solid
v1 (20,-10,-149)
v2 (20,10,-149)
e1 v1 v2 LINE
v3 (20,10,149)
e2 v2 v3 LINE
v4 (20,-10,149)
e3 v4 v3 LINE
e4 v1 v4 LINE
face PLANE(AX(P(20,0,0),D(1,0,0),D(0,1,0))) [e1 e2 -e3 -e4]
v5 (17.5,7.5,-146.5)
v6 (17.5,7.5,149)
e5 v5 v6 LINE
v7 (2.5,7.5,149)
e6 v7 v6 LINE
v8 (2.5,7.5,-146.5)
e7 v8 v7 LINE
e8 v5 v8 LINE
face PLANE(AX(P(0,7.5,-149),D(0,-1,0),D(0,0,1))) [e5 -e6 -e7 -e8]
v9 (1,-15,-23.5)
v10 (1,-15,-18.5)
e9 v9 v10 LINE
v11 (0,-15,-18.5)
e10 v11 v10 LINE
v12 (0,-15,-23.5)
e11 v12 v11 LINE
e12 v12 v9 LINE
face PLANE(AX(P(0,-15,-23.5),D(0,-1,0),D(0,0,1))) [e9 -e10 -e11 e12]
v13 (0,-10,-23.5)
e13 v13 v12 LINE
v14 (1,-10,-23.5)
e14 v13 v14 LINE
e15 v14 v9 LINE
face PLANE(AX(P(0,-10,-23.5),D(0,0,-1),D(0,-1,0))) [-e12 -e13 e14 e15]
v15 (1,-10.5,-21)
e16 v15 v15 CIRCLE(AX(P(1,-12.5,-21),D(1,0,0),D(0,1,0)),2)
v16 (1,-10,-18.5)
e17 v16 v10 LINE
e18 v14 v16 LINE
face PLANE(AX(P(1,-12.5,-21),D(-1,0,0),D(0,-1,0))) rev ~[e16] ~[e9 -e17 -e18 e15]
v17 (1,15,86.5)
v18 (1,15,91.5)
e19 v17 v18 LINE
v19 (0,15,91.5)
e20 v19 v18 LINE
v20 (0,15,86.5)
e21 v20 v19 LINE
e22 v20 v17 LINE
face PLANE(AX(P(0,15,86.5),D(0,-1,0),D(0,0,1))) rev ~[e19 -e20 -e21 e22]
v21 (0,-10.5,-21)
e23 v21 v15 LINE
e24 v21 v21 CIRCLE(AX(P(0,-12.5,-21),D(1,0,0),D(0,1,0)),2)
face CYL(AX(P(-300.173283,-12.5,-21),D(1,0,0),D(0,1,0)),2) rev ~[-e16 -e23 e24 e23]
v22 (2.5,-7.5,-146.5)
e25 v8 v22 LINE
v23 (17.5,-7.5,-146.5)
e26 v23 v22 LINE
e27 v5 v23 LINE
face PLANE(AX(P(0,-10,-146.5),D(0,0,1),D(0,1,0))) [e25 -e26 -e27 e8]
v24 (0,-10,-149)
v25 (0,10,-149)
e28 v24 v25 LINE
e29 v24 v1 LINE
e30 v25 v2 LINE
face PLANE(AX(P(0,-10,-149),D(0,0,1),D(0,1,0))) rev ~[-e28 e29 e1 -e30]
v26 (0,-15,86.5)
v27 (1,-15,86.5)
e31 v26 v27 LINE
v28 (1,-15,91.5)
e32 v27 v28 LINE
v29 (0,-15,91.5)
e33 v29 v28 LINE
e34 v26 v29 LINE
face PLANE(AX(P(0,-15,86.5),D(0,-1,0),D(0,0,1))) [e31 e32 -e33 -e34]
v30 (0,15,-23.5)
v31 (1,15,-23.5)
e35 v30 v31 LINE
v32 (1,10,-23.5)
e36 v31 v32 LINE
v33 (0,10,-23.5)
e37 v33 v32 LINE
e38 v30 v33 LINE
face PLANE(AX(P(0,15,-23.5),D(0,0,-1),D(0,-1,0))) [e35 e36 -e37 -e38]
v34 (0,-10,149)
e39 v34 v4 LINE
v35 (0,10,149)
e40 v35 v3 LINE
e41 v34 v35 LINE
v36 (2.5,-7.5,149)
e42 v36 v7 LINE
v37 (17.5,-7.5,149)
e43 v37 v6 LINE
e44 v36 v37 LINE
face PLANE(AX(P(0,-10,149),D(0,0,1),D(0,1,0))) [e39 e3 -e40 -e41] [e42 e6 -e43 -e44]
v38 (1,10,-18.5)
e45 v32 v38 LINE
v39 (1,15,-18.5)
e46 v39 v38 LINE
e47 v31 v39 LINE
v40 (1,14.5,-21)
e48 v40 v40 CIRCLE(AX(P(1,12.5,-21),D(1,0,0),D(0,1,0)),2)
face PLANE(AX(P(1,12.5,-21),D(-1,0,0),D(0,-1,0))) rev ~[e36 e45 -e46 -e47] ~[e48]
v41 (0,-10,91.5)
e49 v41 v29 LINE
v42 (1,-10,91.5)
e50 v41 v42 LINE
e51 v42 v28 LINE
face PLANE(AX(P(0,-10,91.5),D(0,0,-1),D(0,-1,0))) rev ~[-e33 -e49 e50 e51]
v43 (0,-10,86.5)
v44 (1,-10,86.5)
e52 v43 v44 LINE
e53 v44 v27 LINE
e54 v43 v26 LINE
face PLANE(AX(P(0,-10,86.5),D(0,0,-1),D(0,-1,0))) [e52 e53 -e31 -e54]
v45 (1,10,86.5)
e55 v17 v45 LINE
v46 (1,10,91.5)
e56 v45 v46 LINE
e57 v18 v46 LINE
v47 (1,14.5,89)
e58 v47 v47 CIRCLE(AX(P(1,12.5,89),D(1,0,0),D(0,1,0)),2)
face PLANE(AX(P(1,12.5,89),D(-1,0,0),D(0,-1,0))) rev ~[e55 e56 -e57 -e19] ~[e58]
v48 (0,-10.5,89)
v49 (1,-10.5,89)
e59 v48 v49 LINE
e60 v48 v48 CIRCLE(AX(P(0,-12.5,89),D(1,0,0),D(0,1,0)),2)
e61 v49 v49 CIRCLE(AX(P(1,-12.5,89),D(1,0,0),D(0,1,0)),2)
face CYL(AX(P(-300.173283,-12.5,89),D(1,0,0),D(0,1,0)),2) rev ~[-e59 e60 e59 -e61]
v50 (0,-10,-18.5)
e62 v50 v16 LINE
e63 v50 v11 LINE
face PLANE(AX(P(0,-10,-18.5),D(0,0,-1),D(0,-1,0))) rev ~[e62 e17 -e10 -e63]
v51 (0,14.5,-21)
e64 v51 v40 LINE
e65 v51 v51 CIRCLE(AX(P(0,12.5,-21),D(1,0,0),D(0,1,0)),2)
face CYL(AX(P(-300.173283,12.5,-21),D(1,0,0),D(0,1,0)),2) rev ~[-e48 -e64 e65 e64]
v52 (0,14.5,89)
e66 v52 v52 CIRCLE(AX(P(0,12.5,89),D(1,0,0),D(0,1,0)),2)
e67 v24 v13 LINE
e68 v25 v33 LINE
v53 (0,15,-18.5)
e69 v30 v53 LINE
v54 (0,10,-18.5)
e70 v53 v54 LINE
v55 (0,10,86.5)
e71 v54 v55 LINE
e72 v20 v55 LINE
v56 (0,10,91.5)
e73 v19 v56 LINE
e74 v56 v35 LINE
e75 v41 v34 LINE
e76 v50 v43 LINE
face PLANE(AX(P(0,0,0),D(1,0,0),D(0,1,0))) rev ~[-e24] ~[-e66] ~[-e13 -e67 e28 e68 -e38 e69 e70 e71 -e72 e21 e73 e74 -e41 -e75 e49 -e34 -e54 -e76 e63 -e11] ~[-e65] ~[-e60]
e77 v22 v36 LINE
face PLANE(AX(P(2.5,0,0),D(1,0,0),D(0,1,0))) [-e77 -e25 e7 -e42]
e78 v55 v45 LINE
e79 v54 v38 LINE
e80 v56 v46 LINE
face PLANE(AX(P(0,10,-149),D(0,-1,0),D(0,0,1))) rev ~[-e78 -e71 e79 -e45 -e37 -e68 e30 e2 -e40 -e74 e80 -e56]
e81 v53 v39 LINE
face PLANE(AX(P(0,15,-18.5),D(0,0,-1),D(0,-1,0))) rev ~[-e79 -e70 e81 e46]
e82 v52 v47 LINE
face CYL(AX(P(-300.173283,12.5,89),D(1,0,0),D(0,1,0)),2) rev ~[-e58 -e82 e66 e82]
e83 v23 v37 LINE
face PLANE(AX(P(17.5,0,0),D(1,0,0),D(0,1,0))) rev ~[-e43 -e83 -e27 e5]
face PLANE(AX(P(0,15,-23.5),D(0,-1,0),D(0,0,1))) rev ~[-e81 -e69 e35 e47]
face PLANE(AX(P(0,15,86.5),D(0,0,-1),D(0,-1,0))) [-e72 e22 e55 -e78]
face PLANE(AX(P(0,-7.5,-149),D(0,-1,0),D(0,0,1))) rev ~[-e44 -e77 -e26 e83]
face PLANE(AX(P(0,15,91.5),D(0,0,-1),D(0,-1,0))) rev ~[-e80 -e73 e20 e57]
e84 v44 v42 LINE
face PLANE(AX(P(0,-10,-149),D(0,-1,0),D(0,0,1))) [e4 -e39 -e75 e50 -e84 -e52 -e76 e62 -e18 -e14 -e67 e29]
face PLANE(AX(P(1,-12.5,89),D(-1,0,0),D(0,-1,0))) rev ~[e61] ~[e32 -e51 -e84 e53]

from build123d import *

# Parameters (mm, degrees)
F0_W     = 20
F0_H     = 298
F1_DEPTH = 20
F2_T     = -2.5
F3_W     = 5
F3_H     = 5
F4_DEPTH = 1
F5_D     = 4


# Not quite as in the source:
# - a feature names something its author has since deleted; it is built from what else it names


with BuildPart() as f1:
    # F0 (on Right) → F1 (new body)
    with BuildSketch(Plane.YZ):
        Rectangle(F0_W, F0_H)
    extrude(amount=F1_DEPTH)

    # F2
    f2_openings = [f1.faces().sort_by_distance(p)[0] for p in [
        (10, 0, 149),
    ]]
    offset(amount=F2_T, openings=f2_openings)

    # F3 (on face) → F4 (join)
    with BuildSketch(Plane(origin=(0, 0, 0), x_dir=(0, -1, 0), z_dir=(-1, 0, 0))):
        with Locations((12.5, 89)):
            Rectangle(F3_W, F3_H)
        with Locations((-12.5, 89)):
            Rectangle(F3_W, F3_H)
        with Locations((-12.5, -21)):
            Rectangle(F3_W, F3_H)
        with Locations((12.5, -21)):
            Rectangle(F3_W, F3_H)
    extrude(amount=-F4_DEPTH)

    # F5 (through all)
    with Locations(Plane(origin=(0, 0, 0), x_dir=(0, -1, 0), z_dir=(-1, 0, 0))):
        with Locations((-12.5, 89), (12.5, 89), (-12.5, -21), (12.5, -21)):
            Hole(F5_D / 2)


solid = f1.part
